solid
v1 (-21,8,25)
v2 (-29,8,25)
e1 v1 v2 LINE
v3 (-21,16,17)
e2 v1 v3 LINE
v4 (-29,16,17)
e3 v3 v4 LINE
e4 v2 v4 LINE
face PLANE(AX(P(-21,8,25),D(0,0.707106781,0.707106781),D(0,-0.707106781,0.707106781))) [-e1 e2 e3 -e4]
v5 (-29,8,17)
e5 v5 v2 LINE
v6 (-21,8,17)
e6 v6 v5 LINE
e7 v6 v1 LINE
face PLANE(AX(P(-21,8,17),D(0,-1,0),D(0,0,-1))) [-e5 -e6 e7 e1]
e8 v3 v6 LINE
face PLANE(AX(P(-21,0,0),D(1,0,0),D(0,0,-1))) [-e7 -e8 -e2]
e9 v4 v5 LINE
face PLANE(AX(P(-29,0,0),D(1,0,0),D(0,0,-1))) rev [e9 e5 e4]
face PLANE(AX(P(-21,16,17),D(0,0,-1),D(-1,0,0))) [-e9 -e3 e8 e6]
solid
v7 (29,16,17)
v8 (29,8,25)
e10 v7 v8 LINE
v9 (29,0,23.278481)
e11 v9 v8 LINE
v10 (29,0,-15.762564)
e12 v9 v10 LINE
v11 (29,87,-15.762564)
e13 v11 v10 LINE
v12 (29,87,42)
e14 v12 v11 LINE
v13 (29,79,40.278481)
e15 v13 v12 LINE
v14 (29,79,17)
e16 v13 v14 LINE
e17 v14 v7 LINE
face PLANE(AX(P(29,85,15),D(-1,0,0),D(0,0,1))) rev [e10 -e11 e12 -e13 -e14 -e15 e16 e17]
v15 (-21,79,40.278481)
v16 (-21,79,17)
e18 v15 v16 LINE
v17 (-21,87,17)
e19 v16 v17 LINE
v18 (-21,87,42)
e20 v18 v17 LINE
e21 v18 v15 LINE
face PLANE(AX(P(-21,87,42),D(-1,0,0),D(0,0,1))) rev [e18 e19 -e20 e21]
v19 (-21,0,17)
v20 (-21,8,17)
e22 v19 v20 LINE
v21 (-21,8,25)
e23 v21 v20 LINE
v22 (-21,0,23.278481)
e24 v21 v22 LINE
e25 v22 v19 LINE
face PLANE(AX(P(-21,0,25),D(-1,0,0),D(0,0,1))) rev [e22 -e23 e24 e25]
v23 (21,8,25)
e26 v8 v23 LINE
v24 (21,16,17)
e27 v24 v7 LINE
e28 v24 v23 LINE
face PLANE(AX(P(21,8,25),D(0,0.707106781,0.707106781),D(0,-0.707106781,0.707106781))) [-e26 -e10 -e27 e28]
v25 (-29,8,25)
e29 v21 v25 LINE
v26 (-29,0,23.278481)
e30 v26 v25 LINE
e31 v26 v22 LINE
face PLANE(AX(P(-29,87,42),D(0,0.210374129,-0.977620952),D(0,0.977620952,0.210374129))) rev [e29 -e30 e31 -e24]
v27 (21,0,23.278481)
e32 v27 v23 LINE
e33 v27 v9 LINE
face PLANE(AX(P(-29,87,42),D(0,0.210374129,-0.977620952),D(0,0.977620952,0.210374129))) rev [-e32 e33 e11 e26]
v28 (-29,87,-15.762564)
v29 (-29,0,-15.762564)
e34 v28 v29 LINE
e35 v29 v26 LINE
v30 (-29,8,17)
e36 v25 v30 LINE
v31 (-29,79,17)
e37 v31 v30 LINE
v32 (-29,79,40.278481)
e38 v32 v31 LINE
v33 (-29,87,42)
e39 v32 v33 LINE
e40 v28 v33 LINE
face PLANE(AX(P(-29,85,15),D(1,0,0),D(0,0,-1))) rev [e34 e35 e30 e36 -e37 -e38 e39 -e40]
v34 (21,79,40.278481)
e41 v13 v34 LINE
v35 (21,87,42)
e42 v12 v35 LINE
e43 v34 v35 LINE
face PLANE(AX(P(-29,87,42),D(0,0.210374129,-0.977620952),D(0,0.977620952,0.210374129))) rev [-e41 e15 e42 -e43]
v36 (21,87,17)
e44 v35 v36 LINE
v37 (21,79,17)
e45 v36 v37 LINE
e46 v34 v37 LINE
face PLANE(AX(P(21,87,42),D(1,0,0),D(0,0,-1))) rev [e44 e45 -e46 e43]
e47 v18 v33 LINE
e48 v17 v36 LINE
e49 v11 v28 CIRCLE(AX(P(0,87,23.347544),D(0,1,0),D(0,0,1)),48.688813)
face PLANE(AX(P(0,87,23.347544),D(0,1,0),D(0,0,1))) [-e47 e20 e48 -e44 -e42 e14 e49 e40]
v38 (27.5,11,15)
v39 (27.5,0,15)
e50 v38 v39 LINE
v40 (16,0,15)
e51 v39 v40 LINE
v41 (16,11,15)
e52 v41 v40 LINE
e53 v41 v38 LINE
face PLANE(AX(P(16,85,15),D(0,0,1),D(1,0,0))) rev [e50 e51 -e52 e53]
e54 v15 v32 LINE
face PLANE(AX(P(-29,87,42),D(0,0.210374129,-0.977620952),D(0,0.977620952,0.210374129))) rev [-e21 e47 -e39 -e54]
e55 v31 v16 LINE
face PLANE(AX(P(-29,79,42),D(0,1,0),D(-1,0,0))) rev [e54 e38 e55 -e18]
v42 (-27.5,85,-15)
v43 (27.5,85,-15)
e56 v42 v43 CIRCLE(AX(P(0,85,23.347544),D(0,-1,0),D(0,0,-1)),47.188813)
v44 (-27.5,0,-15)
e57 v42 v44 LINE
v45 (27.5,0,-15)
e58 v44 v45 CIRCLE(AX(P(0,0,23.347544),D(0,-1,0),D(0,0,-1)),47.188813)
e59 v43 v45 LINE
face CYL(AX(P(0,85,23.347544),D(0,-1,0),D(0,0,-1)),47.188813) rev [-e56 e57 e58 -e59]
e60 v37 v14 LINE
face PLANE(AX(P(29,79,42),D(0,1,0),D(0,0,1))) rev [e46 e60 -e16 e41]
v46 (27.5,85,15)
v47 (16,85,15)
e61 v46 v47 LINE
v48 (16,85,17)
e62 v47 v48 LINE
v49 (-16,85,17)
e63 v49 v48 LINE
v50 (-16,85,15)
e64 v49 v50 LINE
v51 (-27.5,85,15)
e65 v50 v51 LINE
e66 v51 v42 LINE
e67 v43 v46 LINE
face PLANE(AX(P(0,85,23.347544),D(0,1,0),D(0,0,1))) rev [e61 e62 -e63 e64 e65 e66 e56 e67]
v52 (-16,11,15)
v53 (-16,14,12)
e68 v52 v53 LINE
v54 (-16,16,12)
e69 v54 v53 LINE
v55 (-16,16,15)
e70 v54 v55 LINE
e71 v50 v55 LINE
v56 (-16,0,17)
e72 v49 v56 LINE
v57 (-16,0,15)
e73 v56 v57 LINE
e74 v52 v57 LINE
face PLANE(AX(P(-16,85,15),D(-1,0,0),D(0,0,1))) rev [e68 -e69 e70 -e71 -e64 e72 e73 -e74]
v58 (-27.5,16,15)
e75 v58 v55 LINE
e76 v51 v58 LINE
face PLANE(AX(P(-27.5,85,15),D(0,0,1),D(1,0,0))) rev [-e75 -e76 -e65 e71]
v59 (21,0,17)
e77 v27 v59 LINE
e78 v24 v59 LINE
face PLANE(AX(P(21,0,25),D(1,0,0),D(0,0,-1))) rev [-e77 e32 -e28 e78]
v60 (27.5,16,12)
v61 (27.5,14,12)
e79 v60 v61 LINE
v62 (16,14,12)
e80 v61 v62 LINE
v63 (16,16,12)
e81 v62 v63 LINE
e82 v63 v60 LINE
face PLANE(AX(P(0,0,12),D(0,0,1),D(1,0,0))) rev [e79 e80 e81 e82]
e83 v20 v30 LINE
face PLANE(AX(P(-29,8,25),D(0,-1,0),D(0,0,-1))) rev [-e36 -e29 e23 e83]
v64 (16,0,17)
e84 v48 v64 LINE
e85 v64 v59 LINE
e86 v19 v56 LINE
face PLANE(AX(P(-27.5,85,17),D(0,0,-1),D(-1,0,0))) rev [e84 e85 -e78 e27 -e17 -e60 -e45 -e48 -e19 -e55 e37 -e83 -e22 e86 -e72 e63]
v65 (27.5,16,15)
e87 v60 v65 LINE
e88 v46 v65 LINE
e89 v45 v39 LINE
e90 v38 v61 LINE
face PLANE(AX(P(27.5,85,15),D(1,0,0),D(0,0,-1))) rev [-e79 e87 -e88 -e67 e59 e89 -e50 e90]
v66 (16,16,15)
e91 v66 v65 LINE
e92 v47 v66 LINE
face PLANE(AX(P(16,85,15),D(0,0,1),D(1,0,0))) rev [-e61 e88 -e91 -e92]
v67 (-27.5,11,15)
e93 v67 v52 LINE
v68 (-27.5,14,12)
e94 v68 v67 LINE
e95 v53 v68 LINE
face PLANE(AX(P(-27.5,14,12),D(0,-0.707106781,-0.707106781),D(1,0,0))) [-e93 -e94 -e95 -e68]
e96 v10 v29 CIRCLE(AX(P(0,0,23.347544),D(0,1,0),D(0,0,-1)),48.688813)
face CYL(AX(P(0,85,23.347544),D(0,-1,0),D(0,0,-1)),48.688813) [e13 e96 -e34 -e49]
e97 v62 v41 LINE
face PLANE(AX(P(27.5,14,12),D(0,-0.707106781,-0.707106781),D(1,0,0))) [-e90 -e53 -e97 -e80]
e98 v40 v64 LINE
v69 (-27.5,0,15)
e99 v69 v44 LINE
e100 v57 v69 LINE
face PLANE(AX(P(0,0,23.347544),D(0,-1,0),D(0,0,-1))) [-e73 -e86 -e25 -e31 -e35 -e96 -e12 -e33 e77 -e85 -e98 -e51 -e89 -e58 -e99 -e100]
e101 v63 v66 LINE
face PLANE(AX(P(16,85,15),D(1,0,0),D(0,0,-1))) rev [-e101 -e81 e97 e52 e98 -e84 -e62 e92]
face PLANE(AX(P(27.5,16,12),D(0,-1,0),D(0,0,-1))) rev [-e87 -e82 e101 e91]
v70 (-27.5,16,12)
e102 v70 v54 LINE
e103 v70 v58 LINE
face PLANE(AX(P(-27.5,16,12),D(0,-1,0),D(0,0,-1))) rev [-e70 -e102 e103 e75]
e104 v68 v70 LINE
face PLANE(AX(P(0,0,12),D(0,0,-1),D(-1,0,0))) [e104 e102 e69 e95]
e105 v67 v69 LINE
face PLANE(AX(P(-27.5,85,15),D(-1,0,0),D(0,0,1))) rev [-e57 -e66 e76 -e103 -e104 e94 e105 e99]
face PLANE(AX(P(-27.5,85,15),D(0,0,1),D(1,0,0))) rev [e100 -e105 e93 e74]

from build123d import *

# Parameters (mm, degrees)
BOSS_EXTRUDE1_DEPTH = 85
BOSS_EXTRUDE3_DEPTH = 2
SKETCH4_W           = 8
SKETCH4_H           = 8
BOSS_EXTRUDE4_DEPTH = 25
SKETCH5_W           = 8
SKETCH5_H           = 8
BOSS_EXTRUDE5_DEPTH = 8
CUT_EXTRUDE1_DEPTH  = 113.680965562
BOSS_EXTRUDE6_DEPTH = 8
BOSS_EXTRUDE7_DEPTH = 8
SKETCH9_W           = 11.5
SKETCH9_H           = 2
BOSS_EXTRUDE8_DEPTH = 3
CHAMFER1_SIZE       = 3


with BuildPart() as part:
    # Sketch1 → Boss-Extrude1 (new body)
    with BuildSketch(Plane(origin=(0, 0, 0), x_dir=(1, 0, 0), z_dir=(0, 1, 0))):
        with BuildLine():
            Line((-29, -15), (-29, 15.762564303))
            ThreePointArc((-29, 15.762564303), (0, 25.341269657), (29, 15.762564303))
            Line((29, 15.762564303), (29, -15))
            Line((29, -15), (29, -17))
            Line((29, -17), (27.5, -17))
            Line((27.5, -17), (16, -17))
            Line((16, -17), (16, -15))
            Line((16, -15), (27.5, -15))
            Line((27.5, -15), (27.5, 15))
            ThreePointArc((27.5, 15), (0, 23.841269657), (-27.5, 15))
            Line((-27.5, 15), (-27.5, -15))
            Line((-27.5, -15), (-16, -15))
            Line((-16, -15), (-16, -17))
            Line((-16, -17), (-27.5, -17))
            Line((-27.5, -17), (-29, -17))
            Line((-29, -17), (-29, -15))
        make_face()
    extrude(amount=BOSS_EXTRUDE1_DEPTH)

    # Sketch3 → Boss-Extrude3 (add)
    with BuildSketch(Plane(origin=(0, 85, 0), x_dir=(1, 0, 0), z_dir=(0, 1, 0))):
        with BuildLine():
            Line((-16, -17), (16, -17))
            Line((16, -17), (29, -17))
            Line((29, -17), (29, 15.762564303))
            ThreePointArc((29, 15.762564303), (0, 25.341269657), (-29, 15.762564303))
            Line((-29, 15.762564303), (-29, -17))
            Line((-29, -17), (-16, -17))
        make_face()
    extrude(amount=BOSS_EXTRUDE3_DEPTH)

    # Sketch4 → Boss-Extrude4 (add)
    with BuildSketch(Plane.XY.offset(17)):
        with Locations((-25, 83)):
            Rectangle(SKETCH4_W, SKETCH4_H)
        with Locations((25, 83)):
            Rectangle(SKETCH4_W, SKETCH4_H)
    extrude(amount=BOSS_EXTRUDE4_DEPTH)

    # Sketch5 → Boss-Extrude5 (add)
    with BuildSketch(Plane.XY.offset(17)):
        with Locations((-25, 4)):
            Rectangle(SKETCH5_W, SKETCH5_H)
        with Locations((25, 4)):
            Rectangle(SKETCH5_W, SKETCH5_H)
    extrude(amount=BOSS_EXTRUDE5_DEPTH)

    # Sketch6 → Cut-Extrude1 (cut, through all)
    with BuildSketch(Plane(origin=(29, 0, 0), x_dir=(0, 0, -1), z_dir=(1, 0, 0))):
        Polygon((-42, 87), (-25, 8), (-22.532486397, -3.466680862), (-79.892152399, -33.861041242), (-91.286550285, 63.092144643), (-70.491971044, 113.237202283), (-29.556352235, 113.237202283), align=None)
    extrude(amount=-CUT_EXTRUDE1_DEPTH, mode=Mode.SUBTRACT)

    # Sketch7 → Boss-Extrude6 (add)
    with BuildSketch(Plane(origin=(29, 0, 0), x_dir=(0, 0, -1), z_dir=(1, 0, 0))):
        Polygon((-25, 8), (-17, 16), (-17, 8), align=None)
    extrude(amount=-BOSS_EXTRUDE6_DEPTH)

    # Sketch9 → Boss-Extrude8 (add)
    with BuildSketch(Plane(origin=(0, 0, 15), x_dir=(-1, 0, 0), z_dir=(0, 0, -1))):
        with Locations((-21.75, 15)):
            Rectangle(SKETCH9_W, SKETCH9_H)
        with Locations((21.75, 15)):
            Rectangle(SKETCH9_W, SKETCH9_H)
    extrude(amount=BOSS_EXTRUDE8_DEPTH)

    # Chamfer1
    chamfer1_edges = [part.edges().sort_by_distance(p)[0] for p in [
        (-21.75, 14, 15),
        (21.75, 14, 15),
    ]]
    chamfer(chamfer1_edges, length=CHAMFER1_SIZE - 0.0001)  # a hair under: the kernel refuses the full size


with BuildPart() as body_2:
    # Sketch8 → Boss-Extrude7 (new body)
    with BuildSketch(Plane.ZY.offset(29)):
        Polygon((25, 8), (17, 16), (17, 8), align=None)
    extrude(amount=-BOSS_EXTRUDE7_DEPTH)


solid = Compound([part.part, body_2.part])
